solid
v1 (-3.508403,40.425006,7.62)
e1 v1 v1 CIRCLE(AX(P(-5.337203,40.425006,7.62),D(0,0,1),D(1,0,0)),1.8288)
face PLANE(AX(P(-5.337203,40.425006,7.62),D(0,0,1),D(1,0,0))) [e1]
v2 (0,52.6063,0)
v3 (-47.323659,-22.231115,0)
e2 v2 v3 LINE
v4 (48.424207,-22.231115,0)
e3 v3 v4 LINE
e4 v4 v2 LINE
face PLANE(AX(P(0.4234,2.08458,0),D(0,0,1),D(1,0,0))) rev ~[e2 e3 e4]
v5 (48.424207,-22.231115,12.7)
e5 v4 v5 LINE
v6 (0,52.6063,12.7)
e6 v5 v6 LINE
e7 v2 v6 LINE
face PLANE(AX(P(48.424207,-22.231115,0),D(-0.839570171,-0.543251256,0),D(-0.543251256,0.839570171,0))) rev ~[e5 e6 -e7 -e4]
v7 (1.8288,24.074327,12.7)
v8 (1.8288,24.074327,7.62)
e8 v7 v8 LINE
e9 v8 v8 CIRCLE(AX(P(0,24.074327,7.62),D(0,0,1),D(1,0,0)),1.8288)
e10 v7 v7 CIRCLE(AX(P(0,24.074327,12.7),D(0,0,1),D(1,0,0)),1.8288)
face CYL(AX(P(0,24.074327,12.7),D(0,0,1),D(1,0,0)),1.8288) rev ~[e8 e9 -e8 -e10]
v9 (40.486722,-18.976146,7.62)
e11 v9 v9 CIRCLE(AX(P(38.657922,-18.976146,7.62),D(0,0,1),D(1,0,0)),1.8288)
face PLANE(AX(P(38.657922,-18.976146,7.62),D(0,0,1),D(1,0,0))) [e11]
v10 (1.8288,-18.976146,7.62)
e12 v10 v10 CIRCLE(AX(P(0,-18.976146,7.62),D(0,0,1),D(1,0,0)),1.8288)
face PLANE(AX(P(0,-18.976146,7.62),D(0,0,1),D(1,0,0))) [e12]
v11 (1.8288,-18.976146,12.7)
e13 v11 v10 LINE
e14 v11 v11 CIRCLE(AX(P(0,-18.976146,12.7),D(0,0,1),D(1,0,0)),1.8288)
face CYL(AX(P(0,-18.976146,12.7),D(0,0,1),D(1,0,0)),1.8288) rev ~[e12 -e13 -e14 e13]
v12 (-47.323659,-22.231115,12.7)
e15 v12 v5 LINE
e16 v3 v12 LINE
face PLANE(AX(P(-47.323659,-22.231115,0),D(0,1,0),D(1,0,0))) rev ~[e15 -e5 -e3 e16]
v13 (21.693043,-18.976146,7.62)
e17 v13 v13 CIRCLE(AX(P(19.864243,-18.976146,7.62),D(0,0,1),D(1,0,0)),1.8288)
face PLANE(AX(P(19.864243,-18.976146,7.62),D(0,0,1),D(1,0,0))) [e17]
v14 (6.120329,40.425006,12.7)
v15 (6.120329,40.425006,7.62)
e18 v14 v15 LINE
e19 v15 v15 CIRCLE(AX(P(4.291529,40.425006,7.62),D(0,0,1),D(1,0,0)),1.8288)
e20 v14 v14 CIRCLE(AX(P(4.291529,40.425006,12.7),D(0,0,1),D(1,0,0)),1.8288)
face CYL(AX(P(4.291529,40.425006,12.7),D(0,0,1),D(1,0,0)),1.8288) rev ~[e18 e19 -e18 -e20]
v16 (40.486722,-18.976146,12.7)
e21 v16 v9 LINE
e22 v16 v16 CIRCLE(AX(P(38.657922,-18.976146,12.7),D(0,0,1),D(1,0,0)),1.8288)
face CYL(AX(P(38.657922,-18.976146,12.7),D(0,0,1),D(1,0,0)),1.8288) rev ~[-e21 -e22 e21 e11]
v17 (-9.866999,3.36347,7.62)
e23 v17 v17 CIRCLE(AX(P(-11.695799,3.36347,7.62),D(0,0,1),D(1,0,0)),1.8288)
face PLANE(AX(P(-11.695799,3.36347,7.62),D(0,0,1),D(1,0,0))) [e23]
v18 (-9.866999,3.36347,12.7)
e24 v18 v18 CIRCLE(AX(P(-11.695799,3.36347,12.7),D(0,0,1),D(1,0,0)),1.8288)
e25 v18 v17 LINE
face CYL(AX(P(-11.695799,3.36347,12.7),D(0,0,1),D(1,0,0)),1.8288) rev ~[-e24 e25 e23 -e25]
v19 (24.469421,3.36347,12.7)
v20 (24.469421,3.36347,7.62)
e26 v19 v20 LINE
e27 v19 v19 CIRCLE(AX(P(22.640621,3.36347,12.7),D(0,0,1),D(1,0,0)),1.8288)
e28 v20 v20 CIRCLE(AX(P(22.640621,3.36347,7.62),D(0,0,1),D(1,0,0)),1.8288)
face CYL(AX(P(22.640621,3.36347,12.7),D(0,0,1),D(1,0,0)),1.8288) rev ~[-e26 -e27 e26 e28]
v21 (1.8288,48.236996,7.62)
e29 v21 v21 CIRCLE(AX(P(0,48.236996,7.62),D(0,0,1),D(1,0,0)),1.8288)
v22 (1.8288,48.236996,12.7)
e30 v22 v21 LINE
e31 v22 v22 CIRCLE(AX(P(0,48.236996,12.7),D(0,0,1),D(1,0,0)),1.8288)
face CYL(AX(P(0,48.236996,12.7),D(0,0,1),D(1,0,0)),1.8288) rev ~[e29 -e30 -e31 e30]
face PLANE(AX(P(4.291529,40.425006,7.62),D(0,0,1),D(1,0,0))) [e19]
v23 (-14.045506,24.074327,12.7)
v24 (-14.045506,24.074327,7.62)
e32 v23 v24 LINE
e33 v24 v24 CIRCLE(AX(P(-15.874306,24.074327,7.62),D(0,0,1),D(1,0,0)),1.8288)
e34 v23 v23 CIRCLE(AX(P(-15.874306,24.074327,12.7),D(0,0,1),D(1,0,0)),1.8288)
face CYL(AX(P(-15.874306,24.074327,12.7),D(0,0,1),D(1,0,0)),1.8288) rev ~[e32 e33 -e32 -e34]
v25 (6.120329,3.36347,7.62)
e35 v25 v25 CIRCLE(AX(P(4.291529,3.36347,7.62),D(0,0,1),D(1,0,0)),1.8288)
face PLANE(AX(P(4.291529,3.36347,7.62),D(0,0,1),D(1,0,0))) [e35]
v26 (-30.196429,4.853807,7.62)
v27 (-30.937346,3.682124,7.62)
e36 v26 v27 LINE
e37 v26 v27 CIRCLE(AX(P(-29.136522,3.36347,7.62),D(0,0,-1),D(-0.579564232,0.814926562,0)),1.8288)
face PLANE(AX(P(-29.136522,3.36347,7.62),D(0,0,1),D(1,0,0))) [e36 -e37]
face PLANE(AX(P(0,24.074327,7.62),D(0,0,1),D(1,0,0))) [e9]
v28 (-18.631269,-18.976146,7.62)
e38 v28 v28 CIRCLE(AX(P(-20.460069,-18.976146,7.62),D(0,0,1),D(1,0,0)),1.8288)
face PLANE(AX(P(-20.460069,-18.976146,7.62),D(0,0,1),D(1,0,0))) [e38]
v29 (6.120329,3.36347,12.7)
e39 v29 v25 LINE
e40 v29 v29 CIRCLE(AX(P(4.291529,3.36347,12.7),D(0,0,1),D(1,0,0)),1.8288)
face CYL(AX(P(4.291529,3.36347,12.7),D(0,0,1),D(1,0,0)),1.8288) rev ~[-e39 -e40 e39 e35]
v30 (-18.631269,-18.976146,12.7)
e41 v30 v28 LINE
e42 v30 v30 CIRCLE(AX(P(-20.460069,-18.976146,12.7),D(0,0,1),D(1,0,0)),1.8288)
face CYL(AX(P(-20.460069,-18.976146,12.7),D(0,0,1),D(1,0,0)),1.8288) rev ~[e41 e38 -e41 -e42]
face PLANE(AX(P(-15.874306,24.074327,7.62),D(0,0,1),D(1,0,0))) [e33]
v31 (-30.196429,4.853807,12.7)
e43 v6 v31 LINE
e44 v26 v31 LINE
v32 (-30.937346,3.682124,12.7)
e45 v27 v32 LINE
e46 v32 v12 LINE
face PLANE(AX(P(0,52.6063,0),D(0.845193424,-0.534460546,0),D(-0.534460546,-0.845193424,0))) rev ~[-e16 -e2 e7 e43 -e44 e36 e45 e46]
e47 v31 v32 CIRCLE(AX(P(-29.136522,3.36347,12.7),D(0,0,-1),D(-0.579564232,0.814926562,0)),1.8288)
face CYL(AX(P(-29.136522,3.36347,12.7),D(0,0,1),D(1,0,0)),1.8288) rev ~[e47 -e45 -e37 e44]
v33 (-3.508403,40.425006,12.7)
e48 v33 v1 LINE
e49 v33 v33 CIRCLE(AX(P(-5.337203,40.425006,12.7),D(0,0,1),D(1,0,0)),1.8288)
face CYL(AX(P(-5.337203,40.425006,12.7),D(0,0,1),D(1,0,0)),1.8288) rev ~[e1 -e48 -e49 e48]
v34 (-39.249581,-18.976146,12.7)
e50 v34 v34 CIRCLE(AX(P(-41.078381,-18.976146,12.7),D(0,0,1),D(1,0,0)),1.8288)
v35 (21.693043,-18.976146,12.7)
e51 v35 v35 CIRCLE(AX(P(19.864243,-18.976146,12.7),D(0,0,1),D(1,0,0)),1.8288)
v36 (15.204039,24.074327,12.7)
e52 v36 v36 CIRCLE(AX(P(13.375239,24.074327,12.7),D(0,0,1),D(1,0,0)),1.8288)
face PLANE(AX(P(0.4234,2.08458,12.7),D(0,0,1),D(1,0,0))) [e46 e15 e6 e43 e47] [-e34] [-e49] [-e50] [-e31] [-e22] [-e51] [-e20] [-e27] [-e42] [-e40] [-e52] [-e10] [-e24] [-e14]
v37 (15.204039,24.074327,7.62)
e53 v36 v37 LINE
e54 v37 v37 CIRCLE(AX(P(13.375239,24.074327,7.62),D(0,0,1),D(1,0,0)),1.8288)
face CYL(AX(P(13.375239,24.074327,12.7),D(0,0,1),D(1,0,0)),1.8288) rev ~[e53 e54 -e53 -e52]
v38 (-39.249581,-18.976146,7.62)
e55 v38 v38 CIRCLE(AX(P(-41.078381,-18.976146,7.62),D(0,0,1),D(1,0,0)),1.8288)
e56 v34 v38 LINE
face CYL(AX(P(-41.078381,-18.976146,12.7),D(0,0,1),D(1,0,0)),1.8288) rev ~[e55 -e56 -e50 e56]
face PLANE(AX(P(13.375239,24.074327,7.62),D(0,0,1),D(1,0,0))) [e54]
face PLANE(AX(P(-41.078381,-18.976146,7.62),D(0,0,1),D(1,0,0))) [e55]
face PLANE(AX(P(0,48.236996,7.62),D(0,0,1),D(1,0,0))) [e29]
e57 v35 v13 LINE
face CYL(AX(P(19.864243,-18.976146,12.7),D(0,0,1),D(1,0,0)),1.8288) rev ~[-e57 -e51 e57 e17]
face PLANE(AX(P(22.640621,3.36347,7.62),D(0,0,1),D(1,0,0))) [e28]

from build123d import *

# Parameters (mm, degrees)
F1_DEPTH = 12.7
F2_R     = 1.8288
F3_DEPTH = 5.08


# Not quite as in the source:
# - the program builds the solid bodies; features that only make, move or delete a surface that nothing else refers to are left out


with BuildPart() as f1:
    # F0 (on Top) → F1 (new body)
    with BuildSketch(Plane.XY):
        Polygon((48.4242066741, -22.2311150283), (0, 52.6062995195), (-47.3236590624, -22.2311150283), align=None)
    extrude(amount=F1_DEPTH)

    # F2 (on face) → F3 (cut)
    with BuildSketch(Plane.XY.offset(12.7)):
        with Locations((-41.0783812404, -18.9761463553)):
            Circle(F2_R)
        with Locations((-20.4600691795, -18.9761463553)):
            Circle(F2_R)
        with Locations((0, -18.9761463553)):
            Circle(F2_R)
        with Locations((19.8642425239, -18.9761463553)):
            Circle(F2_R)
        with Locations((38.6579222977, -18.9761463553)):
            Circle(F2_R)
        with Locations((-29.1365217417, 3.3634696156)):
            Circle(F2_R)
        with Locations((-11.6957994178, 3.3634696156)):
            Circle(F2_R)
        with Locations((4.2915293016, 3.3634696156)):
            Circle(F2_R)
        with Locations((22.6406212896, 3.3634696156)):
            Circle(F2_R)
        with Locations((-15.87430574, 24.0743272007)):
            Circle(F2_R)
        with Locations((0, 24.0743272007)):
            Circle(F2_R)
        with Locations((13.3752385154, 24.0743272007)):
            Circle(F2_R)
        with Locations((-5.3372029215, 40.4250063002)):
            Circle(F2_R)
        with Locations((4.2915293016, 40.4250063002)):
            Circle(F2_R)
        with Locations((0, 48.2369959354)):
            Circle(F2_R)
    extrude(amount=-F3_DEPTH, mode=Mode.SUBTRACT)


solid = f1.part
